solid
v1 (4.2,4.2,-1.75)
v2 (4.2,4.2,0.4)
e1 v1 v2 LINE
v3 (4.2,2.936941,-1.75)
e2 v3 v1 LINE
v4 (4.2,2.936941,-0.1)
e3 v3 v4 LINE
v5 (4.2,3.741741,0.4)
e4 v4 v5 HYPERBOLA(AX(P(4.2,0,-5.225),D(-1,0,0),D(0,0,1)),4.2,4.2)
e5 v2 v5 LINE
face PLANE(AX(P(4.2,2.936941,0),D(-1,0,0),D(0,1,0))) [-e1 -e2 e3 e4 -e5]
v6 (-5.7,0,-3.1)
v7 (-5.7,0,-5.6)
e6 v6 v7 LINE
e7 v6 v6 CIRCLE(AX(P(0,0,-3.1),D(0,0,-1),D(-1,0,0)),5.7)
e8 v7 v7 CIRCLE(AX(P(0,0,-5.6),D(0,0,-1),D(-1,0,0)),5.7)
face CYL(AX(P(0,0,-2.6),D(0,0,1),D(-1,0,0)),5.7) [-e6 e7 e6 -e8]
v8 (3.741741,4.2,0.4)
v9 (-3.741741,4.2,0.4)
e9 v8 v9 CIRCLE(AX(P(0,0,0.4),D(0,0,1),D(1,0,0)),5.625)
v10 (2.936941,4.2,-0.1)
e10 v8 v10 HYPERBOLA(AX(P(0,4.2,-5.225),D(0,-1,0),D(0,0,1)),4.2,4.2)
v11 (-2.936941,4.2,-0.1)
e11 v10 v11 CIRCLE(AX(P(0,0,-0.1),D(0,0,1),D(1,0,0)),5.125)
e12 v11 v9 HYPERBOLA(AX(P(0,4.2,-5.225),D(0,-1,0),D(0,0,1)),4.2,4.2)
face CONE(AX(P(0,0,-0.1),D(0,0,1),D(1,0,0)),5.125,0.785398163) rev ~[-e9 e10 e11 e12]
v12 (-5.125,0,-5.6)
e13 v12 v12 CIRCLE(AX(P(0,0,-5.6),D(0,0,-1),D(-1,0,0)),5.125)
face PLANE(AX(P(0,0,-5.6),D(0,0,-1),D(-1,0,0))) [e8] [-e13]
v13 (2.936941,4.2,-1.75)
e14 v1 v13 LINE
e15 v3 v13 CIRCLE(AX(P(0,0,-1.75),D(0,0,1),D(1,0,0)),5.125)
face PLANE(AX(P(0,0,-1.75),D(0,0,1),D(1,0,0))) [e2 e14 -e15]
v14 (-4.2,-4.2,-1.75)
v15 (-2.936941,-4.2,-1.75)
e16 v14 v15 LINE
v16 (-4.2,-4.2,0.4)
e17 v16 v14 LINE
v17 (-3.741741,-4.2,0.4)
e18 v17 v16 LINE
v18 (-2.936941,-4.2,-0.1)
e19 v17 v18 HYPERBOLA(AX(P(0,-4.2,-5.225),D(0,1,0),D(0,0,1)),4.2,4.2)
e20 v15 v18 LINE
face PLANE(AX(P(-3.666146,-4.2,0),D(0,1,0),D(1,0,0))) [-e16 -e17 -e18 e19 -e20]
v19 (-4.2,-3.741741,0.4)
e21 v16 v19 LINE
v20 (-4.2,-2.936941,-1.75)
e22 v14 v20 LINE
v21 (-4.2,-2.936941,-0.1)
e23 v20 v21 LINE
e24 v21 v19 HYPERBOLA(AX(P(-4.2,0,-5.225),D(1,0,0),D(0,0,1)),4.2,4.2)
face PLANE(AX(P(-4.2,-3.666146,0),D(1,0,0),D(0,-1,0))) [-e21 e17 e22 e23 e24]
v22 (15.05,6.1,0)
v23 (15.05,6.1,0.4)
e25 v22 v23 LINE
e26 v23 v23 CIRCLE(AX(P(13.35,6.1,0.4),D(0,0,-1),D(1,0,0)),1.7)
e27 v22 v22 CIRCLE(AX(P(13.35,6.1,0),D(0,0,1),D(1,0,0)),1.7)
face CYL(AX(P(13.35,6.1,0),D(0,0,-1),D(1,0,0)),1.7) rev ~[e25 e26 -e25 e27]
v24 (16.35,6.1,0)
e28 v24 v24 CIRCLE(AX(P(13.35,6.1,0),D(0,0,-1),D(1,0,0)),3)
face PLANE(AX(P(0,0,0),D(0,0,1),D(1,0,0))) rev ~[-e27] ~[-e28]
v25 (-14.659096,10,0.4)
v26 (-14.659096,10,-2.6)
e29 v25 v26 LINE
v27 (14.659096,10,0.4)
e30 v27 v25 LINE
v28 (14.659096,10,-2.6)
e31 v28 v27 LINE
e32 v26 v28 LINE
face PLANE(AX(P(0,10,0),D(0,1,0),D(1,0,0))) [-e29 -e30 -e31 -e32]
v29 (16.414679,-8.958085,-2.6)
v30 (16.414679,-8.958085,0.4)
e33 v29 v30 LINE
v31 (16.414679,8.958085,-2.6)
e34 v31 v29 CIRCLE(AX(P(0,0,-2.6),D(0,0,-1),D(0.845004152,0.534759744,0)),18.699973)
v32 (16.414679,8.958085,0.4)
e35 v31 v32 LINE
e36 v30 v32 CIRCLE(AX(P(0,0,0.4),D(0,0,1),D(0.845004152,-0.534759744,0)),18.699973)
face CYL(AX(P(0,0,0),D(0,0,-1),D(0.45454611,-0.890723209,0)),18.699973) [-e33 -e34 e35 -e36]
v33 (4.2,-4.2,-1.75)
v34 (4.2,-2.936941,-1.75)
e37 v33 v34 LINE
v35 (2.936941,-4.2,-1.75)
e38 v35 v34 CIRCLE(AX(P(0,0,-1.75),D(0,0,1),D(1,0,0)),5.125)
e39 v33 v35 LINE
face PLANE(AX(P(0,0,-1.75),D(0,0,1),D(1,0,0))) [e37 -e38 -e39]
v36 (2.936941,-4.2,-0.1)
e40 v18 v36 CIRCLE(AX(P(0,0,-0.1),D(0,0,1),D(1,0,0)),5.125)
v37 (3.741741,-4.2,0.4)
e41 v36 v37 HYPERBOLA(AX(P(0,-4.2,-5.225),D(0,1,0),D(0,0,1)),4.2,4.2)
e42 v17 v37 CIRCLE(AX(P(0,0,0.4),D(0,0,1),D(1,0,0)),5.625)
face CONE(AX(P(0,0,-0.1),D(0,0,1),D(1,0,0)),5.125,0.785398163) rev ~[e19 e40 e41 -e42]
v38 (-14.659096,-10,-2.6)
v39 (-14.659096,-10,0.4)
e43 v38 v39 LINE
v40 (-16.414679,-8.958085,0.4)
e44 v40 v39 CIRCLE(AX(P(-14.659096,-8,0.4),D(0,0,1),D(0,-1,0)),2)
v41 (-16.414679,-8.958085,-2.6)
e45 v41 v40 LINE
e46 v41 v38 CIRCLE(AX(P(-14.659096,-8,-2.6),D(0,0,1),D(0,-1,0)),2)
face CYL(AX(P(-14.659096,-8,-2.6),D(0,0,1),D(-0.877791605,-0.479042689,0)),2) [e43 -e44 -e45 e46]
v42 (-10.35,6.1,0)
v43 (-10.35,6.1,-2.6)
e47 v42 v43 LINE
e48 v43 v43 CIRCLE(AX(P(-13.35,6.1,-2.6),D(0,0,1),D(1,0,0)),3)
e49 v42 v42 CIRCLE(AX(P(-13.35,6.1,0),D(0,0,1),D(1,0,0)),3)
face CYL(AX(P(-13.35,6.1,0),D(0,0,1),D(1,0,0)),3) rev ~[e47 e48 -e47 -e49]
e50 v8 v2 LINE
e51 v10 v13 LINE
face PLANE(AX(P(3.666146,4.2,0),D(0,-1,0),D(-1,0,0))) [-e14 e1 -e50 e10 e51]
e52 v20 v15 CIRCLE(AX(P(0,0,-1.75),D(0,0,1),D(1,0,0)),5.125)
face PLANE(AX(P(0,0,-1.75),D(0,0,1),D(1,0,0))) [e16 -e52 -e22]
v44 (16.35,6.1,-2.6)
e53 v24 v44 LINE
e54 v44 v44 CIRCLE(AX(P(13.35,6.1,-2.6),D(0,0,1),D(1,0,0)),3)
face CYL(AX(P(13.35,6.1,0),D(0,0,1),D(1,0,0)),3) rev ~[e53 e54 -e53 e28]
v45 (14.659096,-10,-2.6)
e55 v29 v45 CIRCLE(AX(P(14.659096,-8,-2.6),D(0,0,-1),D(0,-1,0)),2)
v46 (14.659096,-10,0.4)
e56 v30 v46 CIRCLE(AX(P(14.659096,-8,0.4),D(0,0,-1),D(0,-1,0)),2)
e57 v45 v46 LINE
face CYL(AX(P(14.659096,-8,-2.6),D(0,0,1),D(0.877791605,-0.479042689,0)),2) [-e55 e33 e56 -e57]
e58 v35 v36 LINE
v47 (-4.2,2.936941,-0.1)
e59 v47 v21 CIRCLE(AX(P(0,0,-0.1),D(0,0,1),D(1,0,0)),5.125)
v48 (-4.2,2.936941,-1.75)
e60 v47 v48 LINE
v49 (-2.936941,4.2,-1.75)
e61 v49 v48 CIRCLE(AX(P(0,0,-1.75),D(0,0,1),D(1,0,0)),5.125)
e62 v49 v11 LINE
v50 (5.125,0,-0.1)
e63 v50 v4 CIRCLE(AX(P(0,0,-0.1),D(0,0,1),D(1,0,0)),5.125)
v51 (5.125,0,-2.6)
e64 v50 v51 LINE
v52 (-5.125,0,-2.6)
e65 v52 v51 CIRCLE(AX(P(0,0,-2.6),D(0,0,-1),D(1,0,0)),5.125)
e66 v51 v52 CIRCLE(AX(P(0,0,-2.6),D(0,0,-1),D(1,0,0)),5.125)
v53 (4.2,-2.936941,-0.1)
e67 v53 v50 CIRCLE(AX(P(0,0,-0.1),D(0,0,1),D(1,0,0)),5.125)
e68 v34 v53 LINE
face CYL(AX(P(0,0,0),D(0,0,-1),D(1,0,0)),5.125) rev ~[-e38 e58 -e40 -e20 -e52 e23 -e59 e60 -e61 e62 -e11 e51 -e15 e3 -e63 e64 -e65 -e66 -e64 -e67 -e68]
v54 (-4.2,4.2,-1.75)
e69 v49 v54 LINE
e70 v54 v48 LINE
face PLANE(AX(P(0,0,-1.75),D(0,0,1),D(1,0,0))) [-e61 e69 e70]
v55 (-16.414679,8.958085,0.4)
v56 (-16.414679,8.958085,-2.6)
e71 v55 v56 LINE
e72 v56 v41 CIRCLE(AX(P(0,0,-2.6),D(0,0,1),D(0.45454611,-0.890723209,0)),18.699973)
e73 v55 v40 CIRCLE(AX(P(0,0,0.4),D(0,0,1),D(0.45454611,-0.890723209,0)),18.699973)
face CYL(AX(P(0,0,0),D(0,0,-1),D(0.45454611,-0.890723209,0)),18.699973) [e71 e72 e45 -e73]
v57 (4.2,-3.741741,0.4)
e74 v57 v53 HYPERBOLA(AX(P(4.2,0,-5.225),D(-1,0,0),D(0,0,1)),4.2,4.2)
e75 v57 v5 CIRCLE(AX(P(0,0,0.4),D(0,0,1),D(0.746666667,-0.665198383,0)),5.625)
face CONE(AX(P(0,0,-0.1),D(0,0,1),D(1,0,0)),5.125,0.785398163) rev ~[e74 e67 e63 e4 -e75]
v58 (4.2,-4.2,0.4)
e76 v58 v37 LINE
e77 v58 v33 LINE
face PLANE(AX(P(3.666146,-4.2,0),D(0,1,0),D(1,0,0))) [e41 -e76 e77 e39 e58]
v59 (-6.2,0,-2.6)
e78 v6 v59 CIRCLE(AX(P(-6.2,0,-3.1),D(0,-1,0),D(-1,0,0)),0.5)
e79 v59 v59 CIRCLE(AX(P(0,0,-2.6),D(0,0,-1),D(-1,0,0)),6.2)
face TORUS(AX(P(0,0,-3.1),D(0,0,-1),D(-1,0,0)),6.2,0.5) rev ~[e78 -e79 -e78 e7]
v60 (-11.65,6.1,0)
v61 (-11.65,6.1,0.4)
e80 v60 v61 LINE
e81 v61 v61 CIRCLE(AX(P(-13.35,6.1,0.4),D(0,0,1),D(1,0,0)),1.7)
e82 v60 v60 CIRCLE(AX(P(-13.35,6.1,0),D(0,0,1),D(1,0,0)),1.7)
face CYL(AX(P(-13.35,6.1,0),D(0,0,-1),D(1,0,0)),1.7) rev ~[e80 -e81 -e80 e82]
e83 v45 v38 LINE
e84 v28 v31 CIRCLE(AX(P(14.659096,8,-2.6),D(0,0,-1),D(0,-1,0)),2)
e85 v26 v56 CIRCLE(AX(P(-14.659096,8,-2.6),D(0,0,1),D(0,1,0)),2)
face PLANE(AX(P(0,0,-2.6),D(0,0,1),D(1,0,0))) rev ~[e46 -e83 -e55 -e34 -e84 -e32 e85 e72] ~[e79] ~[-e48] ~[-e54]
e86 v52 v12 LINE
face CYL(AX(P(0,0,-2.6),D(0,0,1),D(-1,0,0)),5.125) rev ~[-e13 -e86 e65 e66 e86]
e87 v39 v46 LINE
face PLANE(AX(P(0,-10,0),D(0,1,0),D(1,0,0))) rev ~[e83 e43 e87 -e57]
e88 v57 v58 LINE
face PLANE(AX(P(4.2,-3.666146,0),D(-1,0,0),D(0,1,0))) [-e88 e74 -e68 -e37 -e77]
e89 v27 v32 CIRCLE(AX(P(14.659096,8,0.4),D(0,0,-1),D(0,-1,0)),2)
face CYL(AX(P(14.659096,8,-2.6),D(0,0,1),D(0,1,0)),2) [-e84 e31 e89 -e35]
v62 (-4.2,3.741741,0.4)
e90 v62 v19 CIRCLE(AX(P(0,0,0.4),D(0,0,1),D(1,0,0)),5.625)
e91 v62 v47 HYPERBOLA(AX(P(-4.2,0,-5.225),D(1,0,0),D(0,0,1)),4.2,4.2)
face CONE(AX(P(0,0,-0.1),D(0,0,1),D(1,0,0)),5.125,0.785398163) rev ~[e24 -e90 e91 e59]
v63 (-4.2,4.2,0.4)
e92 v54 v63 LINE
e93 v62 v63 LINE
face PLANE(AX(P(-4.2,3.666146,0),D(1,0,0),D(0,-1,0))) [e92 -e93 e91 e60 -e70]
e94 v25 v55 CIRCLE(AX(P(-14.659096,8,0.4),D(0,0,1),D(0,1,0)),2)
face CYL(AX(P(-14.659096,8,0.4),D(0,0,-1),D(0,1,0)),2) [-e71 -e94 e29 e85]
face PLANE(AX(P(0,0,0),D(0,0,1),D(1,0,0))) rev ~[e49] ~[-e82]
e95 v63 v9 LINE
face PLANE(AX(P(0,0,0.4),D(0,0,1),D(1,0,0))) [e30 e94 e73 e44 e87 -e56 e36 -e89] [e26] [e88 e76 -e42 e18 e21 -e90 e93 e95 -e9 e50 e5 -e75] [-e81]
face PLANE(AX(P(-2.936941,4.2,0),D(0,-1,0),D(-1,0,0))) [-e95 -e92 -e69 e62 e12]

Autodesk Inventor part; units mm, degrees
ref_plane "YZ Plane" through (0, 0, 0) normal (1, 0, 0) x (0, 1, 0)
ref_plane "XZ Plane" through (0, 0, 0) normal (0, 1, 0) x (-1, 0, 0)
ref_plane "XY Plane" through (0, 0, 0) normal (0, 0, 1) x (1, 0, 0)
sketch "Náčrt1" plane through (0, 0, 0) normal (0, 0, 1) x (1, 0, 0)
  circle A0 centre (0, 0) radius 5.125
  arc A1 (8.5, -16.6565) -> (-8.5, -16.6565) centre (0, 0) ccw
  line L0 (-13.35, 6.1) -> (13.35, 6.1)
  line L1 (0, 18.7) -> (0, -18.7)
  line L2 (8.5, -16.6565) -> (8.5, -22.2)
  line L3 (8.5, -22.2) -> (-8.5, -22.2)
  line L4 (-8.5, -22.2) -> (-8.5, -16.6565)
  line L5 (0, -18.7) -> (8.5, -22.2) construction
  line L6 (0, -18.7) -> (-8.5, -22.2) construction
  circle A2 centre (-13.35, 6.1) radius 1.7
  circle A3 centre (13.35, 6.1) radius 1.7
  line L7 (-12.1033, 10) -> (12.1033, 10)
  arc A4 (12.1033, 10) -> (-12.1033, 10) centre (0, 0) ccw
  line L8 (4.2, 4.2) -> (-4.2, 4.2)
  line L9 (-4.2, 4.2) -> (-4.2, -4.2)
  line L10 (-4.2, -4.2) -> (4.2, -4.2)
  line L11 (4.2, -4.2) -> (4.2, 4.2)
  line L12 (4.2, 4.2) -> (-4.2, -4.2) construction
  line L13 (-4.2, 4.2) -> (4.2, -4.2) construction
  line L14 (-3.55, -20.2) -> (3.55, -20.2)
  line L15 (3.55, -20.2) -> (3.55, -17.1)
  line L16 (3.55, -17.1) -> (-3.55, -17.1)
  line L17 (-3.55, -17.1) -> (-3.55, -20.2)
  line L18 (-3.55, -20.2) -> (3.55, -17.1) construction
  line L19 (3.55, -20.2) -> (-3.55, -17.1) construction
  circle A5 centre (0, 0) radius 5.575
  circle A6 centre (0, 0) radius 18.7
  circle A7 centre (-13.35, 6.1) radius 3
  circle A8 centre (13.35, 6.1) radius 3
  line L20 (-17.6407, 10) -> (18.7, 10)
  line L21 (0, 0) -> (-2.6642, 0) construction
  line L22 (-17.6407, -10) -> (18.7, -10)
  point P0 (-10.088, 6.1)
  point P1 (4.2, -2.9369)
  point P2 (2.9369, -4.2)
  point P3 (-2.9369, -4.2)
  point P4 (-4.2, -2.9369)
  point P5 (-4.2, 2.9369)
  point P6 (-2.9369, 4.2)
  point P7 (4.2, 2.9369)
  point P8 (2.9369, 4.2)
  point P9 (0, -18.65)
  point P10 (-8.5, -16.6565)
  point P11 (15.8016, -10)
  point P12 (15.8016, 10)
  point P13 (-15.8016, 10)
  point P14 (-15.8016, -10)
  dimension "d0" = 10.25
  dimension "d1" = 37.4
  dimension "d2" = 26.7
  dimension "d3" = 17
  dimension "d5" = 22.2
  dimension "d7" = 6.1
  dimension "d9" = 3.4
  dimension "d10" = 3.4
  dimension "d12" = 10
  dimension "d14" = 3
  dimension "d25" = 8.4
  dimension "d26" = 8.4
  dimension "d31" = 3.1
  dimension "d32" = 7.1
  dimension "d33" = 2
  dimension "d39" = 0.45
  dimension "d40" = 6
  dimension "d41" = 6
extrude "Vysunutí1" add sketch "Náčrt1" along normal blind 0.4 contours A0 L11 A5 | A0 L8 A5 L11 | L11 A5 L10 A0 | A0 L1 A5 L8 | A5 L8 L11 | L11 L8 A5 L1 L7 L20 A1 L22 L10 | L10 A5 L1 A0 | L11 L10 A5 | A0 L8 A5 L1 | L1 A5 L10 A0 | A0 L9 A5 L8 | A5 L8 L9 L10 L1 L22 A1 L20 L7 | L10 A5 L9 A0 | A0 L9 A5 | A5 L9 L8 | L10 L9 A5 | A7 | A8
extrude "Vysunutí2" add sketch "Náčrt1" against normal blind 2.6 contours A0 L11 A5 | A0 L8 A5 L11 | L11 A5 L10 A0 | A0 L1 A5 L8 | A5 L8 L11 | L11 L8 A5 L1 L7 L20 A1 L22 L10 | L10 A5 L1 A0 | L11 L10 A5 | A0 L8 A5 L1 | L1 A5 L10 A0 | A0 L9 A5 L8 | A5 L8 L9 L10 L1 L22 A1 L20 L7 | L10 A5 L9 A0 | A0 L9 A5 | A5 L9 L8 | L10 L9 A5
chamfer "Zkosení1" distance 0.5 angle 45 1 edges at (-5.125, 0, 0.4)
extrude "Vysunutí3" cut sketch "Náčrt1" along normal blind 0.75 and the other way blind 1.75 contours A0 L8 A5 L11 | L11 A5 L10 A0 | A5 L8 L11 | L11 L10 A5 | A0 L9 A5 L8 | L10 A5 L9 A0 | A5 L9 L8 | L10 L9 A5
sketch "Náčrt2" plane through (0, 0, -2.6) normal (0, 0, -1) x (-1, 0, 0)
  circle A0 centre (0, 0) radius 5.125 projected
  circle A1 centre (0, 0) radius 5.7
  dimension "d35" = 11.4
extrude "Vysunutí4" add sketch "Náčrt2" along normal blind 3
fillet "Zaoblení4" radius 0.5 1 edges at (5.7, 0, -2.6)
fillet "Zaoblení5" radius 2 4 edges at (15.8016, 10, -1.1) (-15.8016, 10, -1.1) (-15.8016, -10, -1.1) (15.8016, -10, -1.1)
properties part number "Držák-Cam+ir V2"
